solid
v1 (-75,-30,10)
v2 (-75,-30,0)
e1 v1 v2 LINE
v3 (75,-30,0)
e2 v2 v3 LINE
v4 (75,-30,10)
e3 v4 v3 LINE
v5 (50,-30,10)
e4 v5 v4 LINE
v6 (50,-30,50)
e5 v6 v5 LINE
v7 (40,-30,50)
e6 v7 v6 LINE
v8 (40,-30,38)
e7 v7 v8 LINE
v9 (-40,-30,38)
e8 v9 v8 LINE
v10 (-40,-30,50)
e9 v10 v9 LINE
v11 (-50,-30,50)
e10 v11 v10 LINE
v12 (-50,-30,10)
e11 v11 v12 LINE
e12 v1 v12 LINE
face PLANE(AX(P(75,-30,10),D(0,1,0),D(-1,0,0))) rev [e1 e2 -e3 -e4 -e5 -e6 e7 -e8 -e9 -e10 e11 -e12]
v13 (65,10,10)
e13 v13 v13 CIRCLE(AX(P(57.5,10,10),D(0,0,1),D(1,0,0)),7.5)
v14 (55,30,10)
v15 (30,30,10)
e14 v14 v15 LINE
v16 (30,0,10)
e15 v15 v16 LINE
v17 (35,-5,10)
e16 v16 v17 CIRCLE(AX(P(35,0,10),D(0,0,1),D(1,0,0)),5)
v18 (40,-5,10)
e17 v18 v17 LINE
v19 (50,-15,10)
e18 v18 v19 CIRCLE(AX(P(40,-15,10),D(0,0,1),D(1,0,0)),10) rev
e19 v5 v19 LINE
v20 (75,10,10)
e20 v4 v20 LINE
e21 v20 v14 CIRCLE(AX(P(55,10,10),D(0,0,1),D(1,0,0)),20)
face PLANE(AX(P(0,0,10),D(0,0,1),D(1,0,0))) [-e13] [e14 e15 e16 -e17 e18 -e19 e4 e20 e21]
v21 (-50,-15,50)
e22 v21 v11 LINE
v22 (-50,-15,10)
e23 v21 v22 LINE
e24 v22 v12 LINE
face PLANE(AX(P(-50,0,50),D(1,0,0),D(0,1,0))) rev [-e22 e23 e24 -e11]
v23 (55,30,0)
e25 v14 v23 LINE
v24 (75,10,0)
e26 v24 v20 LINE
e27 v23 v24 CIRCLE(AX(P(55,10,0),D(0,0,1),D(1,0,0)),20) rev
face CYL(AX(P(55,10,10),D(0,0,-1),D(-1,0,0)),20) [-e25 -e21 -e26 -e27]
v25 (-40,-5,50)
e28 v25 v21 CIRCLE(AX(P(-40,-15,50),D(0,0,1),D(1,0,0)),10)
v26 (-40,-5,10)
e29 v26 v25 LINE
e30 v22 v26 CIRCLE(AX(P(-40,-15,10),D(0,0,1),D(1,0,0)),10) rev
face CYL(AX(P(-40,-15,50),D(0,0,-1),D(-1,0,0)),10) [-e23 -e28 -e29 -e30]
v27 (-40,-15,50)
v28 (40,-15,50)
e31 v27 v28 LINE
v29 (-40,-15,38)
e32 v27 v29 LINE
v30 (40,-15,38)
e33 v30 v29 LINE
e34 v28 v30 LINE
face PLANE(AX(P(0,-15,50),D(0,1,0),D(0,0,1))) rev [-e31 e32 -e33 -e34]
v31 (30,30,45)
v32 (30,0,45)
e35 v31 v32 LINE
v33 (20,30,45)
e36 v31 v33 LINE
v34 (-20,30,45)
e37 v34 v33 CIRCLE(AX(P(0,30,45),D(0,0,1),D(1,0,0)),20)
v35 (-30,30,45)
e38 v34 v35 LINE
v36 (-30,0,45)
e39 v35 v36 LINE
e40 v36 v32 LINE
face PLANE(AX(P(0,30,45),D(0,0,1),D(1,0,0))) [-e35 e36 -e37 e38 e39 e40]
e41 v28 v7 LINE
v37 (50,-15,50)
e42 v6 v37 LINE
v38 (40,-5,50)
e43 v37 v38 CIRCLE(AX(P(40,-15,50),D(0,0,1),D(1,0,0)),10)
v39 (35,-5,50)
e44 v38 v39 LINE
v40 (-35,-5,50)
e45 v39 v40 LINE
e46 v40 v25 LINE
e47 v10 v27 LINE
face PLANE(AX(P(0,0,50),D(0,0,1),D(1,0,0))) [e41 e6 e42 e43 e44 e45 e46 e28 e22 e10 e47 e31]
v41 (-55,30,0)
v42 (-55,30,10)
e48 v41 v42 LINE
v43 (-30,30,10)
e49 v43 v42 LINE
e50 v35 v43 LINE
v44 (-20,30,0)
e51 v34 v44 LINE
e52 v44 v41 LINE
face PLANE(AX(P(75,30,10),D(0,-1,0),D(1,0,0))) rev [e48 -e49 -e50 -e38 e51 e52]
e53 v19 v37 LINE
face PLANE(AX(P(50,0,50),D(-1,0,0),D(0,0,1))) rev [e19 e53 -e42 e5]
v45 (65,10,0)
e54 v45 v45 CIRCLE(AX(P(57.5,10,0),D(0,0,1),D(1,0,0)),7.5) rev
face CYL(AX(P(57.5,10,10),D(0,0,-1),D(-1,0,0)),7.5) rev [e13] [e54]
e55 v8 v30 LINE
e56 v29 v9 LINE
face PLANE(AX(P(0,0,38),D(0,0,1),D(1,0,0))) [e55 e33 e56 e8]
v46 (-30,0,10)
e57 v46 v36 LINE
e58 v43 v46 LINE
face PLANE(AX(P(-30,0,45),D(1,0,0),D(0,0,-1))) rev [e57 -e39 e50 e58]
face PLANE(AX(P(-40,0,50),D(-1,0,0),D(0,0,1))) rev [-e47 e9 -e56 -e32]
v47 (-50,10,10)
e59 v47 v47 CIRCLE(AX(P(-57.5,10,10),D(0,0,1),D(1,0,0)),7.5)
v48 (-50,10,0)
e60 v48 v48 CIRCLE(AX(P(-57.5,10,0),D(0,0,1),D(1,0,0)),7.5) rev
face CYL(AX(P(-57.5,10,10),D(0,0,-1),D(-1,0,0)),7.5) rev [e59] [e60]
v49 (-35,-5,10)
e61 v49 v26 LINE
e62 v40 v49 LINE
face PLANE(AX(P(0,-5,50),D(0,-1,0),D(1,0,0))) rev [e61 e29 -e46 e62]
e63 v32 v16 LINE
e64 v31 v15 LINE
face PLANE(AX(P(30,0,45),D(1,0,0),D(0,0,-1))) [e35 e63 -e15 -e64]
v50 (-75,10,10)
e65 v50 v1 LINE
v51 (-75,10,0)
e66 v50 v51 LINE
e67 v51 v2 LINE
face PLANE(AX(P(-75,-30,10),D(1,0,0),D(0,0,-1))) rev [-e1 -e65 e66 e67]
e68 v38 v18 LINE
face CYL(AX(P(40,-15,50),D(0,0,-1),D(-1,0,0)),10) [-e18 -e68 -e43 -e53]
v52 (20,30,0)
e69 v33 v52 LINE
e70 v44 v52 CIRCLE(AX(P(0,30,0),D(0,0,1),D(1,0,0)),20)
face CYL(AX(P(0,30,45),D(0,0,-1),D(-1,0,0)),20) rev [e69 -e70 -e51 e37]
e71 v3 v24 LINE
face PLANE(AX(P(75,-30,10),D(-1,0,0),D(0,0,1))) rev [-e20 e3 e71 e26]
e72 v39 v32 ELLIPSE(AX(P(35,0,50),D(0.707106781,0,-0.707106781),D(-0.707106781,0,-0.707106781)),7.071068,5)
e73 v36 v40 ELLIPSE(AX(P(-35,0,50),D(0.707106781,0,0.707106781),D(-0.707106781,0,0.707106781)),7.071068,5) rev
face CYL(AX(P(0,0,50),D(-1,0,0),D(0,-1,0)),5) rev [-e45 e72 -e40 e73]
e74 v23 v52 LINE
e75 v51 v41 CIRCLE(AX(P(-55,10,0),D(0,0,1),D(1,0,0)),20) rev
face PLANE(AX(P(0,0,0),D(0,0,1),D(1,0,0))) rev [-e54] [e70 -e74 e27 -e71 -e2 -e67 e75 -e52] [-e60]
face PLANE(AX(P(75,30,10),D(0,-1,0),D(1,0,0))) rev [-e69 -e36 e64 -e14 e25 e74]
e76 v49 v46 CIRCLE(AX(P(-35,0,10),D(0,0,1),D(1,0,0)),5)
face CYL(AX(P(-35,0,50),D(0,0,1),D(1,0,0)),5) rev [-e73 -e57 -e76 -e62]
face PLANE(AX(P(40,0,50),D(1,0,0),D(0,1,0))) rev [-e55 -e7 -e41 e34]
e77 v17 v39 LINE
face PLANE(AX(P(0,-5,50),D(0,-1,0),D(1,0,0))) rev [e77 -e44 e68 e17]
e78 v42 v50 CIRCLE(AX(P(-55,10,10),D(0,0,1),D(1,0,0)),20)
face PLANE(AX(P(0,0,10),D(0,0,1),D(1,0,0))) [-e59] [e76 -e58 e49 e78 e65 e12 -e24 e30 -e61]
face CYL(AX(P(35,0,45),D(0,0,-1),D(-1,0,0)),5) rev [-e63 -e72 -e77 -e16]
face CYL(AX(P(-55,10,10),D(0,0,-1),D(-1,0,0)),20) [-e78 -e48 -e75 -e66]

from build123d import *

# Parameters (mm, degrees)
ESBO_O1_W                  = 150
ESBO_O1_H                  = 60
RESSALTO_EXTRUS_O1_DEPTH   = 10
RESSALTO_EXTRUS_O2_DEPTH   = 40
FILETE1_R                  = 20
FILETE2_R                  = 10
CORTE_EXTRUS_O2_DEPTH      = 10
CORTE_EXTRUS_O2_DEPTH_BACK = 10
ESBO_O4_R                  = 7.5
RESSALTO_EXTRUS_O5_START   = 10
RESSALTO_EXTRUS_O5_DEPTH   = 35
CORTE_EXTRUS_O3_START      = -10
ESBO_O7_R                  = 20
CORTE_EXTRUS_O3_DEPTH      = 10
FILETE4_R                  = 5
ESBO_O8_W                  = 80
ESBO_O8_H                  = 15
RESSALTO_EXTRUS_O6_DEPTH   = 38


with BuildPart() as part:
    # Esboço1 → Ressalto-extrusão1 (new body)
    with BuildSketch(Plane.XY):
        Rectangle(ESBO_O1_W, ESBO_O1_H)
    extrude(amount=RESSALTO_EXTRUS_O1_DEPTH)

    # Esboço3 → Ressalto-extrusão2 (add)
    with BuildSketch(Plane.XY.offset(10)):
        Polygon((-50, -30), (-40, -30), (-40, -15), (40, -15), (40, -30), (50, -30), (50, -5), (-50, -5), align=None)
    extrude(amount=RESSALTO_EXTRUS_O2_DEPTH)

    # Filete1
    filete1_edges = [part.edges().sort_by_distance(p)[0] for p in [
        (-75, 30, 5),
        (75, 30, 5),
    ]]
    fillet(filete1_edges, radius=FILETE1_R)

    # Filete2
    filete2_edges = [part.edges().sort_by_distance(p)[0] for p in [
        (50, -5, 30),
        (-50, -5, 30),
    ]]
    fillet(filete2_edges, radius=FILETE2_R)

    # Esboço4 → Corte-extrusão2 (cut, two sides: drawn at the far end of the back side and taken through both)
    with BuildSketch(Plane.XY.offset(-CORTE_EXTRUS_O2_DEPTH_BACK)):
        with Locations((-57.5, 10)):
            Circle(ESBO_O4_R)
        with Locations((57.5, 10)):
            Circle(ESBO_O4_R)
    extrude(amount=CORTE_EXTRUS_O2_DEPTH + CORTE_EXTRUS_O2_DEPTH_BACK, mode=Mode.SUBTRACT)

    # Esboço5 → Ressalto-extrusão5 (add)
    with BuildSketch(Plane.XY.offset(RESSALTO_EXTRUS_O5_START)):
        with BuildLine():
            Line((-30, 30), (-30, -5))
            Line((-30, -5), (30, -5))
            Line((30, -5), (30, 30))
            Line((30, 30), (20, 30))
            ThreePointArc((20, 30), (0, 10), (-20, 30))
            Line((-20, 30), (-30, 30))
        make_face()
    extrude(amount=RESSALTO_EXTRUS_O5_DEPTH)

    # Esboço7 → Corte-extrusão3 (cut)
    with BuildSketch(Plane.XY.offset(10).offset(CORTE_EXTRUS_O3_START)):
        with Locations((0, 30)):
            Circle(ESBO_O7_R)
    extrude(amount=CORTE_EXTRUS_O3_DEPTH, mode=Mode.SUBTRACT)

    # Filete4
    filete4_edges = [part.edges().sort_by_distance(p)[0] for p in [
        (0, -5, 45),
        (-30, -5, 27.5),
        (30, -5, 27.5),
    ]]
    fillet(filete4_edges, radius=FILETE4_R - 0.0001)  # a hair under: the kernel refuses the full size

    # Esboço8 → Ressalto-extrusão6 (add)
    with BuildSketch(Plane.XY):
        with Locations((0, -22.5)):
            Rectangle(ESBO_O8_W, ESBO_O8_H)
    extrude(amount=RESSALTO_EXTRUS_O6_DEPTH)


solid = part.part
